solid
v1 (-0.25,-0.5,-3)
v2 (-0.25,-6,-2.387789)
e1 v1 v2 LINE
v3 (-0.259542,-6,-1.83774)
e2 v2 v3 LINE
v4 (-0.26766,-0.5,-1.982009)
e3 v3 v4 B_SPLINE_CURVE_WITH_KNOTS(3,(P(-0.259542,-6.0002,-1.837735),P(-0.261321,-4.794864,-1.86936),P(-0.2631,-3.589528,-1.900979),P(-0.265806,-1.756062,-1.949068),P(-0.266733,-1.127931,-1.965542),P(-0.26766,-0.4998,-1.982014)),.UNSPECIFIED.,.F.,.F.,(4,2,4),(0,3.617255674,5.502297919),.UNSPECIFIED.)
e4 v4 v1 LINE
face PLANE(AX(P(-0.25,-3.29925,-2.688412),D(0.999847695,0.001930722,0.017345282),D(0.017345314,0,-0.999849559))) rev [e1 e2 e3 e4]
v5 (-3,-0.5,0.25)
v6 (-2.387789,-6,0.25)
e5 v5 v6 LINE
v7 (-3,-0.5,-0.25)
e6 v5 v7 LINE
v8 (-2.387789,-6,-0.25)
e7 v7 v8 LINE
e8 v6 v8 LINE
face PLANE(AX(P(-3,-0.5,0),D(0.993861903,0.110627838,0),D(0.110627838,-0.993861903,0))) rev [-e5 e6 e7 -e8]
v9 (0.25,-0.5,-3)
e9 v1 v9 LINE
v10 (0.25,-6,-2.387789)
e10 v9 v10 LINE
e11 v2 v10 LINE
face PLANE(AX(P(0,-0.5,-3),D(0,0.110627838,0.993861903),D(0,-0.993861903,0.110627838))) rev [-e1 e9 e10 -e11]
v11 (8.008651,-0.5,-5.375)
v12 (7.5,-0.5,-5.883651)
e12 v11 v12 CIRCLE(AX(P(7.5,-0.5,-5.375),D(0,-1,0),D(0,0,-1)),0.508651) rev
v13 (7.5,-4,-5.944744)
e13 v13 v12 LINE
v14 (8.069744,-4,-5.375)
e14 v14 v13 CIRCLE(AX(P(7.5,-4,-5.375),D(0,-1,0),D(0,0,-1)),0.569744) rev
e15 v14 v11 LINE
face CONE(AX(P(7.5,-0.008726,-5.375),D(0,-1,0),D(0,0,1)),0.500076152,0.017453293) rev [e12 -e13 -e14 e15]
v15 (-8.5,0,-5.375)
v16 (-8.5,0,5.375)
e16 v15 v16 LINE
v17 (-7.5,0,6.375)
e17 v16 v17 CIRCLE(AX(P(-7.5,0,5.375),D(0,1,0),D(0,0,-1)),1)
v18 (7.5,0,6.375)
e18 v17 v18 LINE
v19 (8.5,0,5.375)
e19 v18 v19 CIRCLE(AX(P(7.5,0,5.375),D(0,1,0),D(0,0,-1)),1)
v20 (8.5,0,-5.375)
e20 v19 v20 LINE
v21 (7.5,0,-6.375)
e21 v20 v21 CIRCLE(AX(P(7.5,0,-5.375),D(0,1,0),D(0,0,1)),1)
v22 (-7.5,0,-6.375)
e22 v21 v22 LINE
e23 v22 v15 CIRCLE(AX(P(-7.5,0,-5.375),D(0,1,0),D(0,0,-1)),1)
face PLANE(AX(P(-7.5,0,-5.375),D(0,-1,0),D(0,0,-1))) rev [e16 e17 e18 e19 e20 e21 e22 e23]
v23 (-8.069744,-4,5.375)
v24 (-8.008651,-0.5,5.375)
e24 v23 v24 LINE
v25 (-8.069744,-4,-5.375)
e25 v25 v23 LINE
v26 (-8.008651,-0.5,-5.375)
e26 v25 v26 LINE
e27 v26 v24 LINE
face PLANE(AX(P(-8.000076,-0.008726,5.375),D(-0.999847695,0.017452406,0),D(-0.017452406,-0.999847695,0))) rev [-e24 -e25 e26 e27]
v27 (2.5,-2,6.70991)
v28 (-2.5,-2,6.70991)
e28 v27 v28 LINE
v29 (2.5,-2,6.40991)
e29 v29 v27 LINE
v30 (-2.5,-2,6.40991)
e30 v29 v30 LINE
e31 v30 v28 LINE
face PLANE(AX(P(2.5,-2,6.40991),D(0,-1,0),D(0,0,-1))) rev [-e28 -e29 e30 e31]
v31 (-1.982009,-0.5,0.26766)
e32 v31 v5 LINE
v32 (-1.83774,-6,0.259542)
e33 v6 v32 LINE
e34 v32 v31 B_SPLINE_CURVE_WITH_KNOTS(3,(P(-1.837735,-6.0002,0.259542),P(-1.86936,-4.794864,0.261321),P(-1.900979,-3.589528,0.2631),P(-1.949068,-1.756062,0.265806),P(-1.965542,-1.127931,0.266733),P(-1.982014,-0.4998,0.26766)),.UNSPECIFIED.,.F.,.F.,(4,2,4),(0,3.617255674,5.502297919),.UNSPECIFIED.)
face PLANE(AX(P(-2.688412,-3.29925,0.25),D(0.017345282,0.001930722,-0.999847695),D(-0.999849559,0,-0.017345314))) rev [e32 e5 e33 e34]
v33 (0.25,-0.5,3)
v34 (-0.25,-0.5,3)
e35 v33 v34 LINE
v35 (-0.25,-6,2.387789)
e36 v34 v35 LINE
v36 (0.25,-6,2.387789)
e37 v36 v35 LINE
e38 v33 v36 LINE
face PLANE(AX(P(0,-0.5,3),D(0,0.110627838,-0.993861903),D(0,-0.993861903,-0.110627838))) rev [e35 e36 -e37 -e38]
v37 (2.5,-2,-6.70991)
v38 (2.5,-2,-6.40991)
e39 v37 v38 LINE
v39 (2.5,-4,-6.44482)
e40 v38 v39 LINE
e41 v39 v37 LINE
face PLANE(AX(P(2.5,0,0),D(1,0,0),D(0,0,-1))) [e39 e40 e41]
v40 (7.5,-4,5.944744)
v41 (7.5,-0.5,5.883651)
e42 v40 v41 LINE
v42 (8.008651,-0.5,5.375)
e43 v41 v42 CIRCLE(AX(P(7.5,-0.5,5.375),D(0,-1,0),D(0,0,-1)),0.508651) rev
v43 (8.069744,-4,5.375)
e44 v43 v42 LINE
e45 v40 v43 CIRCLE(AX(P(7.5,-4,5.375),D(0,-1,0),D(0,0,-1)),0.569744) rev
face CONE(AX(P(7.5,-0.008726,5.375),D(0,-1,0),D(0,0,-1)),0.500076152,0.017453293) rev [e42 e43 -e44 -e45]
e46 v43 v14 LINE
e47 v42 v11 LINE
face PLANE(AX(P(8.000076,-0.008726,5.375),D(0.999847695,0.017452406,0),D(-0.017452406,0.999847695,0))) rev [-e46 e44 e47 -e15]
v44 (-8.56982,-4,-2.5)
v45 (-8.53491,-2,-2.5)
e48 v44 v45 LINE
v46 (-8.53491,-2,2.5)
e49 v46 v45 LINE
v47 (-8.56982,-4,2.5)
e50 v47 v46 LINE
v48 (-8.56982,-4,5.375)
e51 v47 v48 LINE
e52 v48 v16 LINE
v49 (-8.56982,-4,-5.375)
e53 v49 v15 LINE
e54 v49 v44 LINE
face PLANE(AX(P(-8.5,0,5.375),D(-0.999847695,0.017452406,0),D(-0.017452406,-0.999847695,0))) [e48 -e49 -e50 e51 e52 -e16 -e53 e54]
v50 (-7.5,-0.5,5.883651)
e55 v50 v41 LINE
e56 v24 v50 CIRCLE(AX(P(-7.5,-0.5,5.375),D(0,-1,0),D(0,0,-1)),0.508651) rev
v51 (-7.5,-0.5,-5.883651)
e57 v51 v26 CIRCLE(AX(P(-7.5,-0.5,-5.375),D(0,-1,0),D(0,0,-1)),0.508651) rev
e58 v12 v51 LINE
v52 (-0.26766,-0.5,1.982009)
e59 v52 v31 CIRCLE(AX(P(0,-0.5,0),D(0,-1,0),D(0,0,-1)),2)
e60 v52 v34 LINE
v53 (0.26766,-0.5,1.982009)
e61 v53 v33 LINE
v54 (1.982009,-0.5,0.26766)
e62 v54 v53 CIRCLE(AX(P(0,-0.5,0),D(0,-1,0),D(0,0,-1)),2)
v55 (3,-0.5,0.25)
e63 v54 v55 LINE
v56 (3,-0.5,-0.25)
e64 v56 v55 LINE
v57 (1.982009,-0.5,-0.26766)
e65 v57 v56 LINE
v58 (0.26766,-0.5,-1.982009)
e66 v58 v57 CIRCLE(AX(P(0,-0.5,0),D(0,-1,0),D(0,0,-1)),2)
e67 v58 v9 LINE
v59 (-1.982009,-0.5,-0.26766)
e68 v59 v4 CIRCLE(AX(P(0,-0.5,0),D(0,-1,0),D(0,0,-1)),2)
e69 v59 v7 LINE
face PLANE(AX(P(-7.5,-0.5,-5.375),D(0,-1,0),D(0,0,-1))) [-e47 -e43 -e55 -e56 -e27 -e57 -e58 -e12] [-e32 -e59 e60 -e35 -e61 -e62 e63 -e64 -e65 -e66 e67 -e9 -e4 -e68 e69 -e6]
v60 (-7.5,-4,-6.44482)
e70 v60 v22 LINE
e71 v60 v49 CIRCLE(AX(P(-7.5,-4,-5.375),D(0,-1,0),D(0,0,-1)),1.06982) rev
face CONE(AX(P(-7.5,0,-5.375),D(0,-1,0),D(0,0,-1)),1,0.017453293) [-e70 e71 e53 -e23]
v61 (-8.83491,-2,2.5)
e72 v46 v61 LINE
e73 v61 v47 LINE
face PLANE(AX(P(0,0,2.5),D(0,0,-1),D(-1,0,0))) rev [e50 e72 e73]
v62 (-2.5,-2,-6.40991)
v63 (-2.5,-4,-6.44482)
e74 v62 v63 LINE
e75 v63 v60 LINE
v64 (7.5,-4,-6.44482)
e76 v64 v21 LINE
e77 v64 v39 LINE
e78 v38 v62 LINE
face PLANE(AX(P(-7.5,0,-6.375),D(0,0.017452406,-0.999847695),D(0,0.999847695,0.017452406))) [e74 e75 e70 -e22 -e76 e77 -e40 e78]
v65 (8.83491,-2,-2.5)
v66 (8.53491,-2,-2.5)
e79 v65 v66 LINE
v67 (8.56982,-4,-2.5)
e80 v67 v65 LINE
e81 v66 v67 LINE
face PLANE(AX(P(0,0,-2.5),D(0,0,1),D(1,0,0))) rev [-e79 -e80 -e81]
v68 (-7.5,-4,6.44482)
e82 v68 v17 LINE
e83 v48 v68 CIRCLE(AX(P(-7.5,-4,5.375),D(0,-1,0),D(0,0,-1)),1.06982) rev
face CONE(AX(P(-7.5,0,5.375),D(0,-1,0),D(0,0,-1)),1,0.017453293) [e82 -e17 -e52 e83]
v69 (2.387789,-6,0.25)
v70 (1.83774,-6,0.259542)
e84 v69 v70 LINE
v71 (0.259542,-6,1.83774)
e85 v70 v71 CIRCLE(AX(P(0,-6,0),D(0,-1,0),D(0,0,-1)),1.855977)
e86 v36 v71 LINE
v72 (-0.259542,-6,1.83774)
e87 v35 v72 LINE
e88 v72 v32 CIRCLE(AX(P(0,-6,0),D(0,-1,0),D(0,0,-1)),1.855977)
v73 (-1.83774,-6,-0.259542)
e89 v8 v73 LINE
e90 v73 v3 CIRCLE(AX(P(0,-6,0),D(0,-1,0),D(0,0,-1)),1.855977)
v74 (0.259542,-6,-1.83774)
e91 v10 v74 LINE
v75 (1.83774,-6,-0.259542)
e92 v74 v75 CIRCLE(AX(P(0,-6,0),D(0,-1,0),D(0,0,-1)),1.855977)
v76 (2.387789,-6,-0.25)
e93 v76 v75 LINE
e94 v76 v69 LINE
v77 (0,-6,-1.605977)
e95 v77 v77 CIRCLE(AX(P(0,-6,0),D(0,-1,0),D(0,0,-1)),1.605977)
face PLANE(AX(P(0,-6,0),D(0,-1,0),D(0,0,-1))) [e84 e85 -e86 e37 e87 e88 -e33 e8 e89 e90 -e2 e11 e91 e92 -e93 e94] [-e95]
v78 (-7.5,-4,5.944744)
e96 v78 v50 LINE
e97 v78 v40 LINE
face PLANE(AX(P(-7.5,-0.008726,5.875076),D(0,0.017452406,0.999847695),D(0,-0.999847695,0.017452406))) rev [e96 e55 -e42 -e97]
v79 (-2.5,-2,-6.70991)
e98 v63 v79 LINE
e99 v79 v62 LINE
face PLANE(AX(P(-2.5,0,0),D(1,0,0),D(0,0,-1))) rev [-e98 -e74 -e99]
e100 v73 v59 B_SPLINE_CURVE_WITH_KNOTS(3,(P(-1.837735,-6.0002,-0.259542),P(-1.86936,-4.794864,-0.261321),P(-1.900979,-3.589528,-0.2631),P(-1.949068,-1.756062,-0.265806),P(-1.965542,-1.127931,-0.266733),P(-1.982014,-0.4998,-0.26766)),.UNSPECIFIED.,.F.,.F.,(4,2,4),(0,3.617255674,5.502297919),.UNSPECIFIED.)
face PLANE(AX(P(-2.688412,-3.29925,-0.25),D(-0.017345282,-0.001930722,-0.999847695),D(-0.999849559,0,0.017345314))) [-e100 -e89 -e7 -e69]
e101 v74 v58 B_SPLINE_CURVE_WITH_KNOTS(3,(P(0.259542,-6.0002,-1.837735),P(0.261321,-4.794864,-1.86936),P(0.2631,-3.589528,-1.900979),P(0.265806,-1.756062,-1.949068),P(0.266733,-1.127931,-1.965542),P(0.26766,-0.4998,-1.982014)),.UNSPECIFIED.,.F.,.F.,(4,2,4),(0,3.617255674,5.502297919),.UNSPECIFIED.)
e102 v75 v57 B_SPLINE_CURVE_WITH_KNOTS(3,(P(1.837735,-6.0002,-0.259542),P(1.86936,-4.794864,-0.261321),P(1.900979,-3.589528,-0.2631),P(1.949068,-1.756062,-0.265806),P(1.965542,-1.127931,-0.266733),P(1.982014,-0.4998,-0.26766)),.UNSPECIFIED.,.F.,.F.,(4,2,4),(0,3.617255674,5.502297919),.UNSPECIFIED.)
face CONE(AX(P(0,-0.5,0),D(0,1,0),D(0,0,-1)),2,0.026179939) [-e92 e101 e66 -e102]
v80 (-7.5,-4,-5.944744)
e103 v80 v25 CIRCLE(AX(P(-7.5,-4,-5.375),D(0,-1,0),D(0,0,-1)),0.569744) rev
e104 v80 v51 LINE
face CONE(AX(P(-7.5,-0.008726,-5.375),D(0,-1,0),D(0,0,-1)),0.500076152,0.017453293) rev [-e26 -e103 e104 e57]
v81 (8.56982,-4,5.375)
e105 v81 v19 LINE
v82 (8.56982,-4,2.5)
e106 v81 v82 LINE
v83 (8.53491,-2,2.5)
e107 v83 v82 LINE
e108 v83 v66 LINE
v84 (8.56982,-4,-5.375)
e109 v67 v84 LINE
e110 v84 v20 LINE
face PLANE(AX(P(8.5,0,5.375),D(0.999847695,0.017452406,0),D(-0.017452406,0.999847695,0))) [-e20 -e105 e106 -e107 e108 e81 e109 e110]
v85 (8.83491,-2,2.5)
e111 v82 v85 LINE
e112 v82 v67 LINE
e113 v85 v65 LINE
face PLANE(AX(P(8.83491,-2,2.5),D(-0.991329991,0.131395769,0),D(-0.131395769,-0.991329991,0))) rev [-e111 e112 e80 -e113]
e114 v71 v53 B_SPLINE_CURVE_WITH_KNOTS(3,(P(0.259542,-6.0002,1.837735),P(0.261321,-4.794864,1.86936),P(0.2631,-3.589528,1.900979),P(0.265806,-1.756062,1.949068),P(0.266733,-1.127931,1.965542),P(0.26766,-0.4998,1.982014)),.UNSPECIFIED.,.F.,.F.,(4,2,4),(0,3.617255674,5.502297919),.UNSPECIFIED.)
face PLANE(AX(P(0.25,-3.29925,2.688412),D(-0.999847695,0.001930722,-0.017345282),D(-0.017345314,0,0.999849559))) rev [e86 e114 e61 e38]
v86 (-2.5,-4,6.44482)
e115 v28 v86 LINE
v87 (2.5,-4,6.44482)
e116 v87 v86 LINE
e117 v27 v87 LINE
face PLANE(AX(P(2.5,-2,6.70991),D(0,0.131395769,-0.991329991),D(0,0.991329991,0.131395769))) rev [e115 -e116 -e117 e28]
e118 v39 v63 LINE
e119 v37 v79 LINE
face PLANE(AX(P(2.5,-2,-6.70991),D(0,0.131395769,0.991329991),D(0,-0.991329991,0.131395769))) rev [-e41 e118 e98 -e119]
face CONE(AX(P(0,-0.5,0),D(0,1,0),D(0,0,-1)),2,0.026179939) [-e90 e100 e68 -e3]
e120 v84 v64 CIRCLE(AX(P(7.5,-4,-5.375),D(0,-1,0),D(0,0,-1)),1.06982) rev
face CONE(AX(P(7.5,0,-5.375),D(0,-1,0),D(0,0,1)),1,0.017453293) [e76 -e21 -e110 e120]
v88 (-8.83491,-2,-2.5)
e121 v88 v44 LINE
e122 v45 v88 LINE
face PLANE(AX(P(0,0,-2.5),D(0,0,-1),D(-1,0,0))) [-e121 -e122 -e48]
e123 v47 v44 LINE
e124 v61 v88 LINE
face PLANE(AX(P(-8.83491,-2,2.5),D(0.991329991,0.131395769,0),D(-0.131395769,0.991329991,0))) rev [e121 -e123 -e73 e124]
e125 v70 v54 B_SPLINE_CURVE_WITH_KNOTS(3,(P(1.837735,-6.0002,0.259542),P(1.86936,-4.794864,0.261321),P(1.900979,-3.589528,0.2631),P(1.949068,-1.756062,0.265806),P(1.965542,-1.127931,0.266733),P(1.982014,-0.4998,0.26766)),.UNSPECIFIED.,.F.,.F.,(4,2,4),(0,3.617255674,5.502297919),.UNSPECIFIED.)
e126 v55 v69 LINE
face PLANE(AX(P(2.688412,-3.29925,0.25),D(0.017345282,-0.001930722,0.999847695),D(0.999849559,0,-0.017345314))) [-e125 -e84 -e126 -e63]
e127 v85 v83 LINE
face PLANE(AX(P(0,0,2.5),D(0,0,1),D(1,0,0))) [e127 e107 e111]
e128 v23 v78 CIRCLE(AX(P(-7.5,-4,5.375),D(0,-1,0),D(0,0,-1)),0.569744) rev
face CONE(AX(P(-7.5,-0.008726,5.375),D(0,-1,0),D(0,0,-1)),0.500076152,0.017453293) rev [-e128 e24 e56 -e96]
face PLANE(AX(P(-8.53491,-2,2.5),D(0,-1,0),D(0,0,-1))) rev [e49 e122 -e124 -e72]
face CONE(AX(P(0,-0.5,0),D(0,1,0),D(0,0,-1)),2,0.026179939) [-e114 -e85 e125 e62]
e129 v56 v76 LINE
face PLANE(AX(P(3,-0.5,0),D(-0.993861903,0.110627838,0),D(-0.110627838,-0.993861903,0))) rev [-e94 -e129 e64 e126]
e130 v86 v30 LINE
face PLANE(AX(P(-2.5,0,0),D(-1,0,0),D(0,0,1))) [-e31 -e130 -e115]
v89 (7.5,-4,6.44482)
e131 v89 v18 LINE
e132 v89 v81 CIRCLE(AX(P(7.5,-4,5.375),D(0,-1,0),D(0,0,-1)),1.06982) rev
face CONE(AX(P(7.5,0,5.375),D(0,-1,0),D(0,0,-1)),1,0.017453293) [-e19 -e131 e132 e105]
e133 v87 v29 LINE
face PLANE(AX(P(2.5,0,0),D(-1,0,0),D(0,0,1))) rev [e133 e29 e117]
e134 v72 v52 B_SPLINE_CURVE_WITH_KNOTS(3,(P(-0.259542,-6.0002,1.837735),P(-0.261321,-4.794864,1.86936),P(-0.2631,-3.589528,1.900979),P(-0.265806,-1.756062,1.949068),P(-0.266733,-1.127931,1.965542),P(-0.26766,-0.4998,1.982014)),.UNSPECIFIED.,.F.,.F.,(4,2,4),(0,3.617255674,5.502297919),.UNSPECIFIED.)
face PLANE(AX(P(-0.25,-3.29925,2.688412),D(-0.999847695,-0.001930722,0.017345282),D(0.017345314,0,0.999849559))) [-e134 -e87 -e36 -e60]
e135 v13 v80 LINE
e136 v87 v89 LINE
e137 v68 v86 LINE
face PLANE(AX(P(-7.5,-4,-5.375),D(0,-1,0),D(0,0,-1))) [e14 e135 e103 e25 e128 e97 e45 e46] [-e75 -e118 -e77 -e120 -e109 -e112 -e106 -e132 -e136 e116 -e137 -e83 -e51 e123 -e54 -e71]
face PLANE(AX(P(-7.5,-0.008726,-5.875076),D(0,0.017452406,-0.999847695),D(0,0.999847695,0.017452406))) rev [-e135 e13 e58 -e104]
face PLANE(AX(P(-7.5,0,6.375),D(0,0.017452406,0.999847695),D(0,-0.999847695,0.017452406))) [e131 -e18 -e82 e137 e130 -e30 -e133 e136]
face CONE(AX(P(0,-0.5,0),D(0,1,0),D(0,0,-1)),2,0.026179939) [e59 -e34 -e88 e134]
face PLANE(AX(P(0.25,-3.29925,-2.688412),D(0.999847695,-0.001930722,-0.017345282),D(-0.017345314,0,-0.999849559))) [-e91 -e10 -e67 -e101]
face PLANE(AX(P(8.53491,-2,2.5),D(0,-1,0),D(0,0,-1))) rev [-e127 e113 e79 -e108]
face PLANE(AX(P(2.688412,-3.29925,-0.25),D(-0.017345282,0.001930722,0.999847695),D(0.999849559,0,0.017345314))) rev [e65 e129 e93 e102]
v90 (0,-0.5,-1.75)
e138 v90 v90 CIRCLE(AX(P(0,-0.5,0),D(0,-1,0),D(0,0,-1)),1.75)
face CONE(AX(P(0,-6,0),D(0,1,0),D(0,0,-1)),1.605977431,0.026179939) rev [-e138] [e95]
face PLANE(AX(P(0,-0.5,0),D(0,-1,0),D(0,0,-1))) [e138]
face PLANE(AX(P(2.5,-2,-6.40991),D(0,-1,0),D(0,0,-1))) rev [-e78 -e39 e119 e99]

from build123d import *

# Parameters (mm, degrees)
BOSS_EXTRUDE1_DEPTH = 4
BOSS_EXTRUDE1_DRAFT = 1
SHELL1_T            = -0.5
SKETCH2_R           = 2
BOSS_EXTRUDE2_DEPTH = 5.5
BOSS_EXTRUDE2_TAPER = 1.5
SKETCH4_R           = 1.605977431
CUT_EXTRUDE1_DEPTH  = 5.5
CUT_EXTRUDE1_DRAFT  = 1.5
BOSS_EXTRUDE3_DEPTH = 2.5
BOSS_EXTRUDE4_DEPTH = 2.5


with BuildPart() as part:
    # Sketch1 → Boss-Extrude1 (with draft: the straight prism first)
    with BuildSketch(Plane(origin=(0, 0, 0), x_dir=(1, 0, 0), z_dir=(0, 1, 0))):
        with BuildLine():
            Line((-7.5, -6.375), (7.5, -6.375))
            ThreePointArc((7.5, -6.375), (8.207106781, -6.082106781), (8.5, -5.375))
            Line((8.5, -5.375), (8.5, 5.375))
            ThreePointArc((8.5, 5.375), (8.207106781, 6.082106781), (7.5, 6.375))
            Line((7.5, 6.375), (-7.5, 6.375))
            ThreePointArc((-7.5, 6.375), (-8.207106781, 6.082106781), (-8.5, 5.375))
            Line((-8.5, 5.375), (-8.5, -5.375))
            ThreePointArc((-8.5, -5.375), (-8.207106781, -6.082106781), (-7.5, -6.375))
        make_face()
    extrude(amount=-BOSS_EXTRUDE1_DEPTH)
    # Boss-Extrude1: the draft: its side faces are tilted about the plane it starts from
    boss_extrude1_sides = [part.faces().sort_by_distance(p)[0] for p in [
        (0, -2, 6.375),
        (8.207106781, -2, 6.082106781),
        (8.5, -2, 0),
        (8.207106781, -2, -6.082106781),
        (0, -2, -6.375),
        (-8.207106781, -2, -6.082106781),
        (-8.5, -2, 0),
        (-8.207106781, -2, 6.082106781),
    ]]
    draft(boss_extrude1_sides, Plane(origin=(0, 0, 0), x_dir=(1, 0, 0), z_dir=(0, 1, 0)), BOSS_EXTRUDE1_DRAFT)

    # Shell1
    shell1_openings = [part.faces().sort_by_distance(p)[0] for p in [
        (0, -4, 0),
    ]]
    offset(amount=SHELL1_T, openings=shell1_openings, kind=Kind.INTERSECTION)

    # Sketch2 → Boss-Extrude2 (add)
    with BuildSketch(Plane.XZ.offset(0.5)):
        Circle(SKETCH2_R)
    extrude(amount=BOSS_EXTRUDE2_DEPTH, taper=BOSS_EXTRUDE2_TAPER)

    # Rib1: read off the stored shape, not the designer's step
    # Rib1: loft between two sections, ruled curve by curve
    rib1_from = [
        Edge.make_line((1.982008604, -0.5, 0.267660037), (3, -0.5, 0.25)),
        Edge.make_line((1.982008604, -0.5, -0.267660037), (3, -0.5, -0.25)),
        Edge.make_line((3, -0.5, -0.25), (3, -0.5, 0.25)),
        Edge.make_line((1.982008604, -0.5, -0.267660037), (1.982008604, -0.5, 0.267660037)),
    ]
    rib1_to = [
        Edge.make_line((1.83774048, -6, 0.259542201), (2.387789079, -6, 0.25)),
        Edge.make_line((1.83774048, -6, -0.259542201), (2.387789079, -6, -0.25)),
        Edge.make_line((2.387789079, -6, -0.25), (2.387789079, -6, 0.25)),
        Edge.make_line((1.83774048, -6, -0.259542201), (1.83774048, -6, 0.259542201)),
    ]
    rib1 = Solid(Shell([*[Face.make_surface_from_curves(rib1_from[k], rib1_to[k]) for k in range(4)], Face(Wire(rib1_from)), Face(Wire(rib1_to))]))
    add(rib1)

    # CirPattern1: read off the stored shape, not the designer's step
    # CirPattern1: loft between two sections, ruled curve by curve
    cirpattern1_from = [
        Edge.make_line((-0.267660037, -0.5, 1.982008604), (-0.25, -0.5, 3)),
        Edge.make_line((0.267660037, -0.5, 1.982008604), (0.25, -0.5, 3)),
        Edge.make_line((0.25, -0.5, 3), (-0.25, -0.5, 3)),
        Edge.make_line((0.267660037, -0.5, 1.982008604), (-0.267660037, -0.5, 1.982008604)),
    ]
    cirpattern1_to = [
        Edge.make_line((-0.259542201, -6, 1.83774048), (-0.25, -6, 2.387789079)),
        Edge.make_line((0.259542201, -6, 1.83774048), (0.25, -6, 2.387789079)),
        Edge.make_line((0.25, -6, 2.387789079), (-0.25, -6, 2.387789079)),
        Edge.make_line((0.259542201, -6, 1.83774048), (-0.259542201, -6, 1.83774048)),
    ]
    cirpattern1 = Solid(Shell([*[Face.make_surface_from_curves(cirpattern1_from[k], cirpattern1_to[k]) for k in range(4)], Face(Wire(cirpattern1_from)), Face(Wire(cirpattern1_to))]))
    add(cirpattern1)

    # CirPattern1 2: loft between two sections, ruled curve by curve
    cirpattern1_2_from = [
        Edge.make_line((-1.982008604, -0.5, -0.267660037), (-3, -0.5, -0.25)),
        Edge.make_line((-1.982008604, -0.5, 0.267660037), (-3, -0.5, 0.25)),
        Edge.make_line((-3, -0.5, 0.25), (-3, -0.5, -0.25)),
        Edge.make_line((-1.982008604, -0.5, 0.267660037), (-1.982008604, -0.5, -0.267660037)),
    ]
    cirpattern1_2_to = [
        Edge.make_line((-1.83774048, -6, -0.259542201), (-2.387789079, -6, -0.25)),
        Edge.make_line((-1.83774048, -6, 0.259542201), (-2.387789079, -6, 0.25)),
        Edge.make_line((-2.387789079, -6, 0.25), (-2.387789079, -6, -0.25)),
        Edge.make_line((-1.83774048, -6, 0.259542201), (-1.83774048, -6, -0.259542201)),
    ]
    cirpattern1_2 = Solid(Shell([*[Face.make_surface_from_curves(cirpattern1_2_from[k], cirpattern1_2_to[k]) for k in range(4)], Face(Wire(cirpattern1_2_from)), Face(Wire(cirpattern1_2_to))]))
    add(cirpattern1_2)

    # CirPattern1 3: loft between two sections, ruled curve by curve
    cirpattern1_3_from = [
        Edge.make_line((0.267660037, -0.5, -1.982008604), (0.25, -0.5, -3)),
        Edge.make_line((-0.267660037, -0.5, -1.982008604), (-0.25, -0.5, -3)),
        Edge.make_line((-0.25, -0.5, -3), (0.25, -0.5, -3)),
        Edge.make_line((-0.267660037, -0.5, -1.982008604), (0.267660037, -0.5, -1.982008604)),
    ]
    cirpattern1_3_to = [
        Edge.make_line((0.259542201, -6, -1.83774048), (0.25, -6, -2.387789079)),
        Edge.make_line((-0.259542201, -6, -1.83774048), (-0.25, -6, -2.387789079)),
        Edge.make_line((-0.25, -6, -2.387789079), (0.25, -6, -2.387789079)),
        Edge.make_line((-0.259542201, -6, -1.83774048), (0.259542201, -6, -1.83774048)),
    ]
    cirpattern1_3 = Solid(Shell([*[Face.make_surface_from_curves(cirpattern1_3_from[k], cirpattern1_3_to[k]) for k in range(4)], Face(Wire(cirpattern1_3_from)), Face(Wire(cirpattern1_3_to))]))
    add(cirpattern1_3)


with BuildPart() as cut_extrude1_tool:
    # Sketch4 → Cut-Extrude1 (with draft: the straight prism first)
    with BuildSketch(Plane.XZ.offset(6)):
        Circle(SKETCH4_R)
    extrude(amount=-CUT_EXTRUDE1_DEPTH)
    # Cut-Extrude1: the draft: its side faces are tilted about the plane it starts from
    cut_extrude1_sides = [cut_extrude1_tool.faces().sort_by_distance(p)[0] for p in [
        (-1.605977431, -3.25, 0),
    ]]
    draft(cut_extrude1_sides, Plane.XZ.offset(6), CUT_EXTRUDE1_DRAFT)


with BuildPart() as part_1:
    add(part.part)

    # Cut-Extrude1: cut by cut_extrude1_tool
    add(cut_extrude1_tool.part, mode=Mode.SUBTRACT)

    # Sketch5 → Boss-Extrude3 (add, symmetric)
    with BuildSketch(Plane(origin=(0, 0, 0), x_dir=(0, 0, -1), z_dir=(1, 0, 0))):
        Polygon((6.44482026, -4), (6.40991013, -2), (6.70991013, -2), align=None)
        Polygon((-6.70991013, -2), (-6.44482026, -4), (-6.40991013, -2), align=None)
    extrude(amount=BOSS_EXTRUDE3_DEPTH, both=True)

    # Sketch6 → Boss-Extrude4 (add, symmetric)
    with BuildSketch(Plane.XY):
        Polygon((8.56982026, -4), (8.53491013, -2), (8.83491013, -2), align=None)
        Polygon((-8.83491013, -2), (-8.56982026, -4), (-8.53491013, -2), align=None)
    extrude(amount=BOSS_EXTRUDE4_DEPTH, both=True)


solid = part_1.part
